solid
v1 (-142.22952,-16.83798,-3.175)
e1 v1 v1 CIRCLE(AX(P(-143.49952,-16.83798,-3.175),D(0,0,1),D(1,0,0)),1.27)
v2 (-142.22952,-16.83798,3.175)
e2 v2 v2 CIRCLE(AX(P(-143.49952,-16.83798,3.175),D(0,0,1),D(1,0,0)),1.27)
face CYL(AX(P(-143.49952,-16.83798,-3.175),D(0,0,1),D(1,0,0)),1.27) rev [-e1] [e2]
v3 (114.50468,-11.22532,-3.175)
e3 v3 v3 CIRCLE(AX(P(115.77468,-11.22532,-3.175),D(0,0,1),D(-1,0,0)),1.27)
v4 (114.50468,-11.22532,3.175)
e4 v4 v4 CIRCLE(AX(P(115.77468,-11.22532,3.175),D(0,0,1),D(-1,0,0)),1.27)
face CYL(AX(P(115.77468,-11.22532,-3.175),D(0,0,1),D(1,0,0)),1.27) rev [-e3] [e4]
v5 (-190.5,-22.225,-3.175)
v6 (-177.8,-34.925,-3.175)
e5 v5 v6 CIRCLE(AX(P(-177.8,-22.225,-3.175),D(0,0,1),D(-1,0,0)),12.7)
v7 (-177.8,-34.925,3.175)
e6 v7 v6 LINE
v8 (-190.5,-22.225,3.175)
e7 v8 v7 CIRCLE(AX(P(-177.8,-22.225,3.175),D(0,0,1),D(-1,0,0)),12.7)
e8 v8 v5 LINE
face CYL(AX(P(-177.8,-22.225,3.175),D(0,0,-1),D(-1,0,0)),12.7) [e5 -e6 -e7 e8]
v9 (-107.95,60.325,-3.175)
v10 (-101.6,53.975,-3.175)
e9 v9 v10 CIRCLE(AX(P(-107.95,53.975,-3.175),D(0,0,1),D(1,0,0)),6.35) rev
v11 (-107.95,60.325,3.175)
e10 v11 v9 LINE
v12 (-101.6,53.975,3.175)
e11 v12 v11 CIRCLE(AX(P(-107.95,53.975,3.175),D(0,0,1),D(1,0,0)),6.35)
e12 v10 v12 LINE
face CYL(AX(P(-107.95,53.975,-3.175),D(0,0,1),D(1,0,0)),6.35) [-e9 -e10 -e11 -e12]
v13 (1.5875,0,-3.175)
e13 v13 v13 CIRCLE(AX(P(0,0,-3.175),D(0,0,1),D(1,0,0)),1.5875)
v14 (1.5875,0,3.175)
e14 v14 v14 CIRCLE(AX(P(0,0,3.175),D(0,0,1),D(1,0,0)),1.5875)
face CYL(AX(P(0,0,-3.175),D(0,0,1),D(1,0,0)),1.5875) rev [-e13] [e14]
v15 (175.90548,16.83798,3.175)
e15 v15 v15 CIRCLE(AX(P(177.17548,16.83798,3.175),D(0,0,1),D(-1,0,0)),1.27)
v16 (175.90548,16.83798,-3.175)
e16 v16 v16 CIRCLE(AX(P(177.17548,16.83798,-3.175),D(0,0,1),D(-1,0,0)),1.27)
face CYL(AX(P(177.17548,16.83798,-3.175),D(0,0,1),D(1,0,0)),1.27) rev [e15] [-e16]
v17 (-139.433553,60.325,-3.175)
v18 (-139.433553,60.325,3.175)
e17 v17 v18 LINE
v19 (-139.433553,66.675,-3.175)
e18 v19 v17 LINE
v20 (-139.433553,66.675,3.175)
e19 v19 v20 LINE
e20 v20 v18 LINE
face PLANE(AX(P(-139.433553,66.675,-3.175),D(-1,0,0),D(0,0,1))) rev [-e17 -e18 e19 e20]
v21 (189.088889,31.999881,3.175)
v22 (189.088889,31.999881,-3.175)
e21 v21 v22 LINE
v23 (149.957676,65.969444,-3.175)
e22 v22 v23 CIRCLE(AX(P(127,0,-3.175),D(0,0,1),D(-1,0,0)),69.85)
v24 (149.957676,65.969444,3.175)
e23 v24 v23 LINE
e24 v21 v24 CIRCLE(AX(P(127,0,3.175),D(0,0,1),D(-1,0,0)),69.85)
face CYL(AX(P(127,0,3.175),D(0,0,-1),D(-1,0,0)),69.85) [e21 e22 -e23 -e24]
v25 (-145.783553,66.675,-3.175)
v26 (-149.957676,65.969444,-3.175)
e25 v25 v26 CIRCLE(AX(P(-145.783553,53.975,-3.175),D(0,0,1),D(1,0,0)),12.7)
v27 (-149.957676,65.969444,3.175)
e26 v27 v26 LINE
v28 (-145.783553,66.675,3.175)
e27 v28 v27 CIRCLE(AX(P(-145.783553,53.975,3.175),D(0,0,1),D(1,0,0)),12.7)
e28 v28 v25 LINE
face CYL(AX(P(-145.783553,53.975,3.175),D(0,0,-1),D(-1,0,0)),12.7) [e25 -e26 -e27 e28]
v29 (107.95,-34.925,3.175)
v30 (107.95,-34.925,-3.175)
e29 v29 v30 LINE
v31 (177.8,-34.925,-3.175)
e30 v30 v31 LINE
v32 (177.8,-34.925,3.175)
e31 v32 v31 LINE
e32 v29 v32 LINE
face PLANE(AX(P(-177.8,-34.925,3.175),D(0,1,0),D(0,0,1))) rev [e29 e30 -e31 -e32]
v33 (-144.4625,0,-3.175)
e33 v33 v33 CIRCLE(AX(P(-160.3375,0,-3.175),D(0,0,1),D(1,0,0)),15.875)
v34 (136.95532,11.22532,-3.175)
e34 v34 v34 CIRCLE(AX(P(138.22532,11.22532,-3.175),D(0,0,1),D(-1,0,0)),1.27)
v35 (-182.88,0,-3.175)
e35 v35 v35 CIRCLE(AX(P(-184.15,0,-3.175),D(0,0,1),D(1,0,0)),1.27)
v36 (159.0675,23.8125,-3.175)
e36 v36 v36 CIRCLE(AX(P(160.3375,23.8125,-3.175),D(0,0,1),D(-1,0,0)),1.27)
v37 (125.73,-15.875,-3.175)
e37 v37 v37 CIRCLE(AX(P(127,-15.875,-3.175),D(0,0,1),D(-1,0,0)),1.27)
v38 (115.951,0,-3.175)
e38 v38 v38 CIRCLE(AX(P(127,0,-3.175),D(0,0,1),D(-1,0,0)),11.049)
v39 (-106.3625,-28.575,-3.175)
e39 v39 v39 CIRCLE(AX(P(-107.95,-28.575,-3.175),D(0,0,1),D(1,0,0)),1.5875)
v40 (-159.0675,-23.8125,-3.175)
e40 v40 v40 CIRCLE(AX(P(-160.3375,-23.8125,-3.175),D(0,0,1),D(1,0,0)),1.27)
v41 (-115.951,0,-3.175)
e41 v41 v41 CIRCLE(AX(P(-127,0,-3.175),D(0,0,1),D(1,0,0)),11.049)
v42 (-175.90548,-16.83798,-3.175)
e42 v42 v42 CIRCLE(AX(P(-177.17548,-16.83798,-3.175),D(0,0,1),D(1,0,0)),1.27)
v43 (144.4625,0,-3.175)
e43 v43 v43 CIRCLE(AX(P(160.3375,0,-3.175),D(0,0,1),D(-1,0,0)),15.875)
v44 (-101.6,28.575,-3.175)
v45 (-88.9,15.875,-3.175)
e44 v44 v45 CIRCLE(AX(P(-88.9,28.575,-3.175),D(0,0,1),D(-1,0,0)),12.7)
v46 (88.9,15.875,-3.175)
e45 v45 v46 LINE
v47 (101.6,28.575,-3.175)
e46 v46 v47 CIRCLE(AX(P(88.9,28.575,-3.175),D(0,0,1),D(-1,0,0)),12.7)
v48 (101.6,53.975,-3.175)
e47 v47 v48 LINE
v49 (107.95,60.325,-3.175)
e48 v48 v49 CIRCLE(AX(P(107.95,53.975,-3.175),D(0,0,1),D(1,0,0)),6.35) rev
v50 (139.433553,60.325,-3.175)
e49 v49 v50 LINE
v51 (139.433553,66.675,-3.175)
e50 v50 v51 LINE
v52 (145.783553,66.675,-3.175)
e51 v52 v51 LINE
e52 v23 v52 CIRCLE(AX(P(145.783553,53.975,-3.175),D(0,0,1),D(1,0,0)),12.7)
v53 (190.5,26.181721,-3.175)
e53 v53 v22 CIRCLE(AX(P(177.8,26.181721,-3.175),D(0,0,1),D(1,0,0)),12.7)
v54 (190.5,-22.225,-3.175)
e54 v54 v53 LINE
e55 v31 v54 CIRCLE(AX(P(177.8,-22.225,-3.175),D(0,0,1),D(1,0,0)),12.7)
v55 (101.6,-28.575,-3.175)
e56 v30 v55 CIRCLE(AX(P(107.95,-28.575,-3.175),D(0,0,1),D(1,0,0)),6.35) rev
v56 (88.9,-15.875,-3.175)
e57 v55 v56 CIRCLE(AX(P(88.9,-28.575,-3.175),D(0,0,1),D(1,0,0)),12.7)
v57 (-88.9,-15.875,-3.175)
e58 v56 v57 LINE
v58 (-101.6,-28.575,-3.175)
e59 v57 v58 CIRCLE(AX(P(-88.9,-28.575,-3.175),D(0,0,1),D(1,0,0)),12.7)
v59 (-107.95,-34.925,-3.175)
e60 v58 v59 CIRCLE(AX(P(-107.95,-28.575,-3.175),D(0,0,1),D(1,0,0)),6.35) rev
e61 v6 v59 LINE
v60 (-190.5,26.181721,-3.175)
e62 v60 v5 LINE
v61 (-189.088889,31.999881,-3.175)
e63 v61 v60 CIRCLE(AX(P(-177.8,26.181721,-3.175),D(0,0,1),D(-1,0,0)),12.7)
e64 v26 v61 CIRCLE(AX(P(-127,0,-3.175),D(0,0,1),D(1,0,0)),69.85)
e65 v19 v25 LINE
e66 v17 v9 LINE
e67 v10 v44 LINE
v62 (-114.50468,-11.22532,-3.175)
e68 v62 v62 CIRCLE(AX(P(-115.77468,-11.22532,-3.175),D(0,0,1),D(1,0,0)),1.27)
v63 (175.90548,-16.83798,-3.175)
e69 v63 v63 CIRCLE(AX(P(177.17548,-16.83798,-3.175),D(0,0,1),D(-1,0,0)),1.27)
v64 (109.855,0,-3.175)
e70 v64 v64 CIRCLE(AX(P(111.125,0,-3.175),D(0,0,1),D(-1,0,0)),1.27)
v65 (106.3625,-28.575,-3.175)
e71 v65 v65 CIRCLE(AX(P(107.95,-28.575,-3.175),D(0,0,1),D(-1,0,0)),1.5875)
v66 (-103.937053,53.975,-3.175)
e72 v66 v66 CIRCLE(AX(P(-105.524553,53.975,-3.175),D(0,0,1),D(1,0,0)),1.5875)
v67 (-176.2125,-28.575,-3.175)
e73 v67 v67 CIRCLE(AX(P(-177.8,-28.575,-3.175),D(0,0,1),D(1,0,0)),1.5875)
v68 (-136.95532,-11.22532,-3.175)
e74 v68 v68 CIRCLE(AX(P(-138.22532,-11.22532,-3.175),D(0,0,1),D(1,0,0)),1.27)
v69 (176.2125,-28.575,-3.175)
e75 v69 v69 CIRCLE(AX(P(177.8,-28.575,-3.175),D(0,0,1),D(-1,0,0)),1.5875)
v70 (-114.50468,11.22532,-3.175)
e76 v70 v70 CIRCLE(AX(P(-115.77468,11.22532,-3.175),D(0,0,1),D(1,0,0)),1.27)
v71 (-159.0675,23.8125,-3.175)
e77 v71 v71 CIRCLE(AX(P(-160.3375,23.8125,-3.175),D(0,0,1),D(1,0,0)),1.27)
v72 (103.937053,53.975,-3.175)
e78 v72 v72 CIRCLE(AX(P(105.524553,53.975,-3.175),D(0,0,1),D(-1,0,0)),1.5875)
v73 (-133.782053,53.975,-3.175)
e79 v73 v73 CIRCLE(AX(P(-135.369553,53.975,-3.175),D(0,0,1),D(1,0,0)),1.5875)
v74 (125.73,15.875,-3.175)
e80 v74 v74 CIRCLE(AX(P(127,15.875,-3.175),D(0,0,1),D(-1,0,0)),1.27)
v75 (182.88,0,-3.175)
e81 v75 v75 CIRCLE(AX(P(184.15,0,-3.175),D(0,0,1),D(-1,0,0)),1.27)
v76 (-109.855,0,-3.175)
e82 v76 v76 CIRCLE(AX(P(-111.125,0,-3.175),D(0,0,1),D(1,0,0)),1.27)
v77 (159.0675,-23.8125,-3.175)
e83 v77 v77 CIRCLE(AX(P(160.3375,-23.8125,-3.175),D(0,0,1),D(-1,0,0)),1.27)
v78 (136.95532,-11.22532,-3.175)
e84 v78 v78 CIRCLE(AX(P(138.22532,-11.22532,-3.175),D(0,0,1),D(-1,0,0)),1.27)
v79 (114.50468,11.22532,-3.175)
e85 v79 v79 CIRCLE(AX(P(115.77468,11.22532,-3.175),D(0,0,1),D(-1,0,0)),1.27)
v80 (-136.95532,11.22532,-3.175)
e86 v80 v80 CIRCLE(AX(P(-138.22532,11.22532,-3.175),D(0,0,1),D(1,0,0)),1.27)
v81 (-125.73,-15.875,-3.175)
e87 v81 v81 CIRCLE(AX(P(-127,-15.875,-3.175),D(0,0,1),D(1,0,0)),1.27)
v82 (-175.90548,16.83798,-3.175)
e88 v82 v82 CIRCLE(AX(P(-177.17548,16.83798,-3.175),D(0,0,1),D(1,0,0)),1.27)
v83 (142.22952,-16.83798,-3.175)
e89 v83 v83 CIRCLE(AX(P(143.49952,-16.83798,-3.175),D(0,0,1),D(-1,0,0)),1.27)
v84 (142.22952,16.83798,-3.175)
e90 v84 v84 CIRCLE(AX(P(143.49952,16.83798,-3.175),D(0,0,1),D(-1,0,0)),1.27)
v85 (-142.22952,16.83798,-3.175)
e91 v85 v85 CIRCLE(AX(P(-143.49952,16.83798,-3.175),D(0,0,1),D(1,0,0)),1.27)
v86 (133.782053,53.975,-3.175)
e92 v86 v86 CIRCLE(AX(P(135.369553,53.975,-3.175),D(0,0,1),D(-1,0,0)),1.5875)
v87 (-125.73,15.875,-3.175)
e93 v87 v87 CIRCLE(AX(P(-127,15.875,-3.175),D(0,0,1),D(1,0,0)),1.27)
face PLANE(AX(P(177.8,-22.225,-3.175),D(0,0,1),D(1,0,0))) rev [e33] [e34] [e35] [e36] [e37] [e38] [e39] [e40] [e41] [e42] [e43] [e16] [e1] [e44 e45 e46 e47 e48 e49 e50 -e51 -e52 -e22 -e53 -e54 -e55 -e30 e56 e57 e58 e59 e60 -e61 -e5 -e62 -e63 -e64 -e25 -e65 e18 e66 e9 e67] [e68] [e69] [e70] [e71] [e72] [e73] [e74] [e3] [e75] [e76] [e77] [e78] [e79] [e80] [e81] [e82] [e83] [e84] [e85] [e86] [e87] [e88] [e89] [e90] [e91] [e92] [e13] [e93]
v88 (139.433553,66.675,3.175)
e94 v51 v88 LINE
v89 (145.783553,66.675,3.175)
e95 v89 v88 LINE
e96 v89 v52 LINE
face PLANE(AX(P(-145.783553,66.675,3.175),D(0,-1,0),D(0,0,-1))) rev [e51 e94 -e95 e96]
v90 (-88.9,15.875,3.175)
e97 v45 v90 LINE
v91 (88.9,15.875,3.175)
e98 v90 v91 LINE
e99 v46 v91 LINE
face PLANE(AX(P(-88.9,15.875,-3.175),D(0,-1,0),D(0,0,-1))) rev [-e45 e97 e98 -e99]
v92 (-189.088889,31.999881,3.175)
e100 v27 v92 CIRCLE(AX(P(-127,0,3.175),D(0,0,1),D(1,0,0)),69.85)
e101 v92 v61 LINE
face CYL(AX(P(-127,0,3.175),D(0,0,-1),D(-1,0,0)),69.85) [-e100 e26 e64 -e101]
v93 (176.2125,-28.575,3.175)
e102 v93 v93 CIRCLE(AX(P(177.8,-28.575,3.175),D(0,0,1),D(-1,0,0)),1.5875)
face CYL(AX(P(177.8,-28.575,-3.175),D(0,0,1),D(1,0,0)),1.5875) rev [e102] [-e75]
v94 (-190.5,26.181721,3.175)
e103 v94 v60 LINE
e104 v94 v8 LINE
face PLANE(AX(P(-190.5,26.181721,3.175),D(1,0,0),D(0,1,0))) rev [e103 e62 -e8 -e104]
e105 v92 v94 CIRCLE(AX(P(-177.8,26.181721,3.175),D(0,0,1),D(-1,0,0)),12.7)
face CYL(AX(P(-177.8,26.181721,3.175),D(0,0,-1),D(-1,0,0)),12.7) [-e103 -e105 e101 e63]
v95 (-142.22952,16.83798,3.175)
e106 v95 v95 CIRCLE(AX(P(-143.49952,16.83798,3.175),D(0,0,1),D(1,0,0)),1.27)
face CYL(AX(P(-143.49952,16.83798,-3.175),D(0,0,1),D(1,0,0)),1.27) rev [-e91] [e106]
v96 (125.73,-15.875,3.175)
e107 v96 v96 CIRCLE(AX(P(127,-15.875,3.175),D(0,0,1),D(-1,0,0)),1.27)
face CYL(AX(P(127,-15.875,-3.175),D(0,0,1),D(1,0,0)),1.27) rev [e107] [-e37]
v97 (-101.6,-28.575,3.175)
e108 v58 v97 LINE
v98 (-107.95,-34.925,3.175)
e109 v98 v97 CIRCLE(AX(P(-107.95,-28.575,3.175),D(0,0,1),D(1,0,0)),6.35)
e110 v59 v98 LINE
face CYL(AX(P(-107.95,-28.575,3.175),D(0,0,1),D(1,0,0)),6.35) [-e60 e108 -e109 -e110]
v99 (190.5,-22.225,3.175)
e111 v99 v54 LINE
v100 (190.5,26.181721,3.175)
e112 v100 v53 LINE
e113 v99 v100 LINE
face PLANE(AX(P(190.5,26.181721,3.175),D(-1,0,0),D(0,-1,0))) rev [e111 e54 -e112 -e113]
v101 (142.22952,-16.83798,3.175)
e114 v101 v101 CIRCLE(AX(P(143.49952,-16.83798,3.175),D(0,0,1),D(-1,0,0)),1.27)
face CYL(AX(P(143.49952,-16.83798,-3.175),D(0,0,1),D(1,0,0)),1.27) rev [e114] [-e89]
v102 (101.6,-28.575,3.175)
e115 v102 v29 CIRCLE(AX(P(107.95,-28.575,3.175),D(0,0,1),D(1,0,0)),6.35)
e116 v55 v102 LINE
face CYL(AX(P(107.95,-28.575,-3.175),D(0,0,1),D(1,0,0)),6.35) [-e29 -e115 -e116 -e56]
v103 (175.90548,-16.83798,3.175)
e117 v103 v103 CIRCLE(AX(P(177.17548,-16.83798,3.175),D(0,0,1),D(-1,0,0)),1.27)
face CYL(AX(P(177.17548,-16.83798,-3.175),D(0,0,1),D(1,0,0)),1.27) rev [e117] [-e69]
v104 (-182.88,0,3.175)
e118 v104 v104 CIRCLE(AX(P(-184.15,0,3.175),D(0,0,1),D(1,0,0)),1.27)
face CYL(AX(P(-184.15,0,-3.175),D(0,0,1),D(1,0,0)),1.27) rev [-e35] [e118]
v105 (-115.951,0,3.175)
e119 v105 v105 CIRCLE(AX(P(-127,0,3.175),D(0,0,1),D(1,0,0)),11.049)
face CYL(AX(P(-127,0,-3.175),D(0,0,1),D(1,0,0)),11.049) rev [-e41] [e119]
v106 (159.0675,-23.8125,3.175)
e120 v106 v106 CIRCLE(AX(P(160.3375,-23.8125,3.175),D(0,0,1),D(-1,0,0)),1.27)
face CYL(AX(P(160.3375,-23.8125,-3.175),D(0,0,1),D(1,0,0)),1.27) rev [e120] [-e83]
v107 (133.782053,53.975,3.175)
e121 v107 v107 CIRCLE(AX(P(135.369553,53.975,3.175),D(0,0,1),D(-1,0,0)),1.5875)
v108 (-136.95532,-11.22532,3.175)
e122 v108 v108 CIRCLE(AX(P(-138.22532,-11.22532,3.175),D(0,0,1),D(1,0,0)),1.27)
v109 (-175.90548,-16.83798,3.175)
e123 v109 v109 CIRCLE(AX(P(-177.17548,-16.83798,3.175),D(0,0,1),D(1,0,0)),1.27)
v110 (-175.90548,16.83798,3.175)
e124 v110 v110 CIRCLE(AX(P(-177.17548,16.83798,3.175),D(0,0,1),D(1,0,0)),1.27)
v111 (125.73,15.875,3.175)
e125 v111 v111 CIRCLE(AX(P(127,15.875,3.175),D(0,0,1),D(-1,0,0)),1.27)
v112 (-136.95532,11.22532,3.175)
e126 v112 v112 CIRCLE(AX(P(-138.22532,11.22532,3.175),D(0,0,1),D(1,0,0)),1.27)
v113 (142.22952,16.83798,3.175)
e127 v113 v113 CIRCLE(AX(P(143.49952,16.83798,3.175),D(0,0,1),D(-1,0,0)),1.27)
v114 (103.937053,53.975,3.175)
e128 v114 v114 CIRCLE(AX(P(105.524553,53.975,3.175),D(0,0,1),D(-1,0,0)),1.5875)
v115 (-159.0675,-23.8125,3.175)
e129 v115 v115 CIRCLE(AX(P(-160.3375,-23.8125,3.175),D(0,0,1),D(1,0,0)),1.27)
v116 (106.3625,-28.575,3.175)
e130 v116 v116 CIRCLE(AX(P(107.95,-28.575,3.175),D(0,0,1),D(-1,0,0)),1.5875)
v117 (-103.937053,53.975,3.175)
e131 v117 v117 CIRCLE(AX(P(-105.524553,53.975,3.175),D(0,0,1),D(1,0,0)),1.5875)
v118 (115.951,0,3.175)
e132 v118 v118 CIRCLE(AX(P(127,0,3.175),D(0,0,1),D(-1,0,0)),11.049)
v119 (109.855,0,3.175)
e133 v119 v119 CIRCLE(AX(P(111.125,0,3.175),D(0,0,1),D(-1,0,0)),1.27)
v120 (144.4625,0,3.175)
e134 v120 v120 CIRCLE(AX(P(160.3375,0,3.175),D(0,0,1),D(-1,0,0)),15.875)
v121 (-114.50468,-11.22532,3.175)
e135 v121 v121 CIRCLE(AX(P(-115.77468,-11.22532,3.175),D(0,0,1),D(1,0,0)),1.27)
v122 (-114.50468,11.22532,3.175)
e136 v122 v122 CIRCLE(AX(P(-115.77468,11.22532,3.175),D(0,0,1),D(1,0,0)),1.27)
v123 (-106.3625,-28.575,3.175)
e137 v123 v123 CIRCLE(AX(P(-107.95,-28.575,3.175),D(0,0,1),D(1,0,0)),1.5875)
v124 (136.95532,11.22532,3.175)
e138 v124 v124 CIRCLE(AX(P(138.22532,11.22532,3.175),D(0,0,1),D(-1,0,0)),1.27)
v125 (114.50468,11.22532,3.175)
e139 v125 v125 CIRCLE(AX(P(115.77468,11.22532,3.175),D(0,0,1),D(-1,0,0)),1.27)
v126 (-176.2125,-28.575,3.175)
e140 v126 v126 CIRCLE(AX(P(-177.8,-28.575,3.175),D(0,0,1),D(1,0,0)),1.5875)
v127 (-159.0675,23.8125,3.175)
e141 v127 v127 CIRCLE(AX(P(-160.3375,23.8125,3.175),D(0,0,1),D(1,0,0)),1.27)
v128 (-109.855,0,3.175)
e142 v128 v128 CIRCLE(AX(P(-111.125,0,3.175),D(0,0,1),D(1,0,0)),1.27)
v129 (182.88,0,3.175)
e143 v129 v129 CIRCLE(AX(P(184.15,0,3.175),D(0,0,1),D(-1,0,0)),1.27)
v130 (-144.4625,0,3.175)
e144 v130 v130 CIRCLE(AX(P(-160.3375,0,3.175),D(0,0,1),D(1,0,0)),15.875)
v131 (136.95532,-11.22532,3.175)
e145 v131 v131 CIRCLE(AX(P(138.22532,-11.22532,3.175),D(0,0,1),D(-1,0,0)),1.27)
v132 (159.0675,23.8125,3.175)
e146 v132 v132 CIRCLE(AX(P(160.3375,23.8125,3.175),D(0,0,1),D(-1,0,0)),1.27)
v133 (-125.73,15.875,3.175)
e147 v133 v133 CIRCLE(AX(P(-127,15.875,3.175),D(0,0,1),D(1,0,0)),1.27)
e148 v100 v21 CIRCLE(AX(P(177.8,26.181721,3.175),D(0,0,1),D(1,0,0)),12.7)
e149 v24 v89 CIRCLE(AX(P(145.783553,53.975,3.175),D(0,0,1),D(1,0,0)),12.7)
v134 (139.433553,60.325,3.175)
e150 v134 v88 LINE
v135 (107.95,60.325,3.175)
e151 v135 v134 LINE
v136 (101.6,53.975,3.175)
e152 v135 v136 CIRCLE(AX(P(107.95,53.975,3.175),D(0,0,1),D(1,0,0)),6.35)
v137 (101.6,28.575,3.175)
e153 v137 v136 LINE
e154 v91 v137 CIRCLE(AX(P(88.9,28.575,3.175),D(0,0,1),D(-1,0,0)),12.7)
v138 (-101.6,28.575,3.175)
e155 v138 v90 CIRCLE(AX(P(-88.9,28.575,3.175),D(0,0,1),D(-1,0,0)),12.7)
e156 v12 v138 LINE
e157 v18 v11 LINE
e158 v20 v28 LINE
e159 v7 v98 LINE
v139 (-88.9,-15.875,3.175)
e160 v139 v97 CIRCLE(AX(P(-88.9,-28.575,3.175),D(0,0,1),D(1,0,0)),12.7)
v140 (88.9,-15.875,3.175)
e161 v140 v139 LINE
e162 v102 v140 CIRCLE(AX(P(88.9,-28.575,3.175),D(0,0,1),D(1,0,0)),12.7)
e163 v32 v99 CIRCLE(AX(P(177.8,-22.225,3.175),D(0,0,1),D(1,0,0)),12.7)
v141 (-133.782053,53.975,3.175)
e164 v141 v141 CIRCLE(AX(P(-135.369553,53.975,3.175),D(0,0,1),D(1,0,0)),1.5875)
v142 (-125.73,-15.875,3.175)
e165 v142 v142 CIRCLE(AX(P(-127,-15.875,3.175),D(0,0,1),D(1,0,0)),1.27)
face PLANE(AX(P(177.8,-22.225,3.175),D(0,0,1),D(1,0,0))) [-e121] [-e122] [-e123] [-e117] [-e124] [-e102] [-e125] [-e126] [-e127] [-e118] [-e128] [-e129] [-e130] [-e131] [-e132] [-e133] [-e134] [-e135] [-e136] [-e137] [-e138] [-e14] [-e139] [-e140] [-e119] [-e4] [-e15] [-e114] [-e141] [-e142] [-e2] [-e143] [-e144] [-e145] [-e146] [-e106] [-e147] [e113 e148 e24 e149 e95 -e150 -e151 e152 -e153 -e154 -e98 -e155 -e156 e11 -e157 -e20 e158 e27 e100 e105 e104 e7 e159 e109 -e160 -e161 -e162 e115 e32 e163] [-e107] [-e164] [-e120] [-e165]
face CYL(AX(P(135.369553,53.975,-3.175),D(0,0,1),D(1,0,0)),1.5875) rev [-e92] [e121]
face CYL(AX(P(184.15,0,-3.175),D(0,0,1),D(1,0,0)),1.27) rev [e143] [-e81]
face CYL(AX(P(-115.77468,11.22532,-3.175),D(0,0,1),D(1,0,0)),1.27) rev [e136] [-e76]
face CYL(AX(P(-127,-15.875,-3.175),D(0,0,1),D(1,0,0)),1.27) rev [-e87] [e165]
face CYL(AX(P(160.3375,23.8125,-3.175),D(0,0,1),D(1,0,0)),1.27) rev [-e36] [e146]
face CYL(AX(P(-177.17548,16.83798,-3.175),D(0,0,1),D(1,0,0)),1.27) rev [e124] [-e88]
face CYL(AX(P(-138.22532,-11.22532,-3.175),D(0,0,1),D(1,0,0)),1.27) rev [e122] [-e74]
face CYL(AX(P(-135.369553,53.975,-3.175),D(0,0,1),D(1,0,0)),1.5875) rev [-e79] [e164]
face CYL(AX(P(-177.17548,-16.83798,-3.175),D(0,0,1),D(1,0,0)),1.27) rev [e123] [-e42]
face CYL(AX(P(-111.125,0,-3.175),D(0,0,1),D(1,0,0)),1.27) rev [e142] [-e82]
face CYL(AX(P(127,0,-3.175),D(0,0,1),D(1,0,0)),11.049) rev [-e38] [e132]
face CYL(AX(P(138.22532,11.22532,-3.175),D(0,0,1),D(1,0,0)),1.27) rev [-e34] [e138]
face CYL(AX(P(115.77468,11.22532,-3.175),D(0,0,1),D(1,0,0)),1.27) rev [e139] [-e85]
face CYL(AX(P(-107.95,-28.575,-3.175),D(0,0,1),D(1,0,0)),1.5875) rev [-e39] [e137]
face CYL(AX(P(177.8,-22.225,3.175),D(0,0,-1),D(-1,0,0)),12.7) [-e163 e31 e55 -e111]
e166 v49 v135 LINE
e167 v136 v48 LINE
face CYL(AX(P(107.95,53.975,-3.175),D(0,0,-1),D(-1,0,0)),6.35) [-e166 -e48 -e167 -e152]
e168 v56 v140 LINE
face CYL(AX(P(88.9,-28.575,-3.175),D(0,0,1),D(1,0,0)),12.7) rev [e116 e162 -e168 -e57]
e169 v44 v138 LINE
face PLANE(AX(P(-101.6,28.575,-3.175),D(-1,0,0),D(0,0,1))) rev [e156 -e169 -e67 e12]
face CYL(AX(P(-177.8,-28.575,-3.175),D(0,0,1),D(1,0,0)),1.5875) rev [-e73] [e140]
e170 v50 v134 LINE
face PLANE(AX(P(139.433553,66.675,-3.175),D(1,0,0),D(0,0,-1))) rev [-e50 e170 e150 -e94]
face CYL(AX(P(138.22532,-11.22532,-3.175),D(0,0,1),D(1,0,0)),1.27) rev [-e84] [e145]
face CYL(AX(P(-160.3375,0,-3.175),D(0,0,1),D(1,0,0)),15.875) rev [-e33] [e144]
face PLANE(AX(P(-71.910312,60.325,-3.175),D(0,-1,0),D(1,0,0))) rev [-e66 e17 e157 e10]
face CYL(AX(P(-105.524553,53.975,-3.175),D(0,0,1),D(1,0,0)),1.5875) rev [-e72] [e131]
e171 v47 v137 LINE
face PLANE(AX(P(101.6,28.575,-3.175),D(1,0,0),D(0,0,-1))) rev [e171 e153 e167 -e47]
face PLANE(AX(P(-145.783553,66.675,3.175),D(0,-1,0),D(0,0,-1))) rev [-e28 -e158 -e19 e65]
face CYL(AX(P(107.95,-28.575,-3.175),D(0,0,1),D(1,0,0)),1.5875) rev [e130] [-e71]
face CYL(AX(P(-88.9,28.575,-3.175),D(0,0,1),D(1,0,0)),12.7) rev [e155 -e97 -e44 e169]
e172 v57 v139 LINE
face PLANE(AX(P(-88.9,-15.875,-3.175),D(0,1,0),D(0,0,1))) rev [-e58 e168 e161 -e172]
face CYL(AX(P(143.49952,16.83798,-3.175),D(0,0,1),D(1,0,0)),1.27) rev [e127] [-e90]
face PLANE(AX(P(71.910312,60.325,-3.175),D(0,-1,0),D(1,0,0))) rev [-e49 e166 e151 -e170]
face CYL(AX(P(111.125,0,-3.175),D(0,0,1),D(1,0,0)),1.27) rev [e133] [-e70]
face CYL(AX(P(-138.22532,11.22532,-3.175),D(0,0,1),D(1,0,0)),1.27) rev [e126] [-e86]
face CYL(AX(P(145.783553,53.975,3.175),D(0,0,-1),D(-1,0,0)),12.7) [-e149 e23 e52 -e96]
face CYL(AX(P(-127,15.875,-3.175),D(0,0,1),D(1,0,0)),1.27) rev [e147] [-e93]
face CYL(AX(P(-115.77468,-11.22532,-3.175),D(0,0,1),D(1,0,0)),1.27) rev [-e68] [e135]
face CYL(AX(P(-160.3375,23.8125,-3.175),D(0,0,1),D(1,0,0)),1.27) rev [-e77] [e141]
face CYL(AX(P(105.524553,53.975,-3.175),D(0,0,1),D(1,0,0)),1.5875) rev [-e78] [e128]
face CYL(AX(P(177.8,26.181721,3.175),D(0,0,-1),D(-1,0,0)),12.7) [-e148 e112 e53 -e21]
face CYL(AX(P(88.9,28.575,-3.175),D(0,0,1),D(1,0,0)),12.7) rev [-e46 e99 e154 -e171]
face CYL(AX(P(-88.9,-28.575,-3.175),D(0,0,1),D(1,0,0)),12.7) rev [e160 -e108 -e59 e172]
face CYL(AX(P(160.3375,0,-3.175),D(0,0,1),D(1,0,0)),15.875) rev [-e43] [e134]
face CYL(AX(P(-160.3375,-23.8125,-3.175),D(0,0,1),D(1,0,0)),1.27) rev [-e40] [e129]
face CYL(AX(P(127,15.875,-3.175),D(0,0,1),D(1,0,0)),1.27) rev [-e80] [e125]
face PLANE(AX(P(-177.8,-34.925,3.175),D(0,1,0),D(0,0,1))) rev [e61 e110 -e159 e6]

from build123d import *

# Parameters (mm, degrees)
SKETCH1_R           = 3.175
BOSS_EXTRUDE1_DEPTH = 3.175
SKETCH2_R           = 11.049
SKETCH2_R_2         = 15.875
SKETCH2_R_3         = 1.27
CUT_EXTRUDE1_DEPTH  = 202.930998425
ITC_CUTOUT_DEPTH    = 202.930998425
SKETCH6_W           = 67.523241089
SKETCH6_H           = 6.35
CUT_EXTRUDE3_DEPTH  = 202.930998425
FILLET1_R           = 6.35
CUT_EXTRUDE4_DEPTH  = 202.930998425
FILLET2_R           = 6.35
SKETCH8_R           = 1.5875
CUT_EXTRUDE5_DEPTH  = 202.930998425
SKETCH10_R          = 1.5875
CUT_EXTRUDE6_DEPTH  = 202.930998425


with BuildPart() as part:
    # Sketch1 → Boss-Extrude1 (new, symmetric)
    with BuildSketch(Plane.XY):
        with BuildLine():
            Line((-145.783553311, 66.675), (145.783553311, 66.675))
            ThreePointArc((145.783553311, 66.675), (147.900219978, 66.497368874), (149.957676269, 65.969444444))
            ThreePointArc((149.957676269, 65.969444444), (172.789871953, 52.74760778), (189.088888889, 31.999880883))
            ThreePointArc((189.088888889, 31.999880883), (190.142181511, 29.17513943), (190.5, 26.181720723))
            Line((190.5, 26.181720723), (190.5, -22.225))
            ThreePointArc((190.5, -22.225), (186.780256121, -31.205256121), (177.8, -34.925))
            Line((177.8, -34.925), (-177.8, -34.925))
            ThreePointArc((-177.8, -34.925), (-186.780256121, -31.205256121), (-190.5, -22.225))
            Line((-190.5, -22.225), (-190.5, 26.181720723))
            ThreePointArc((-190.5, 26.181720723), (-190.142181511, 29.17513943), (-189.088888889, 31.999880883))
            ThreePointArc((-189.088888889, 31.999880883), (-172.789871953, 52.74760778), (-149.957676269, 65.969444444))
            ThreePointArc((-149.957676269, 65.969444444), (-147.900219978, 66.497368874), (-145.783553311, 66.675))
        make_face()
        with Locations((-127, 0)):
            Circle(SKETCH1_R, mode=Mode.SUBTRACT)
        with Locations((127, 0)):
            Circle(SKETCH1_R, mode=Mode.SUBTRACT)
    extrude(amount=BOSS_EXTRUDE1_DEPTH, both=True)

    # Sketch2 → Cut-Extrude1 (cut, through all)
    with BuildSketch(Plane.XY.offset(3.175)):
        with Locations((-127, 0)):
            Circle(SKETCH2_R)
        with Locations((-160.3375, 0)):
            Circle(SKETCH2_R_2)
        with Locations((-143.499519773, 16.837980227)):
            Circle(SKETCH2_R_3)
        with Locations((-160.3375, 23.8125)):
            Circle(SKETCH2_R_3)
        with Locations((-143.499519773, -16.837980227)):
            Circle(SKETCH2_R_3)
        with Locations((-160.3375, -23.8125)):
            Circle(SKETCH2_R_3)
        with Locations((-177.175480227, -16.837980227)):
            Circle(SKETCH2_R_3)
        with Locations((-184.15, 0)):
            Circle(SKETCH2_R_3)
        with Locations((-177.175480227, 16.837980227)):
            Circle(SKETCH2_R_3)
        with Locations((-127, 15.875)):
            Circle(SKETCH2_R_3)
        with Locations((-115.774679849, 11.225320151)):
            Circle(SKETCH2_R_3)
        with Locations((-111.125, 0)):
            Circle(SKETCH2_R_3)
        with Locations((-115.774679849, -11.225320151)):
            Circle(SKETCH2_R_3)
        with Locations((-127, -15.875)):
            Circle(SKETCH2_R_3)
        with Locations((-138.225320151, -11.225320151)):
            Circle(SKETCH2_R_3)
        with Locations(Location((138.225320151, 11.225320151, 0), (0, 0, 180))):
            Circle(SKETCH2_R_3)
        with Locations((-138.225320151, 11.225320151)):
            Circle(SKETCH2_R_3)
        with Locations(Location((138.225320151, -11.225320151, 0), (0, 0, 180))):
            Circle(SKETCH2_R_3)
        with Locations(Location((127, -15.875, 0), (0, 0, 180))):
            Circle(SKETCH2_R_3)
        with Locations(Location((115.774679849, -11.225320151, 0), (0, 0, 180))):
            Circle(SKETCH2_R_3)
        with Locations(Location((111.125, 0, 0), (0, 0, 180))):
            Circle(SKETCH2_R_3)
        with Locations(Location((115.774679849, 11.225320151, 0), (0, 0, 180))):
            Circle(SKETCH2_R_3)
        with Locations(Location((127, 15.875, 0), (0, 0, 180))):
            Circle(SKETCH2_R_3)
        with Locations(Location((177.175480227, 16.837980227, 0), (0, 0, 180))):
            Circle(SKETCH2_R_3)
        with Locations(Location((184.15, 0, 0), (0, 0, 180))):
            Circle(SKETCH2_R_3)
        with Locations(Location((177.175480227, -16.837980227, 0), (0, 0, 180))):
            Circle(SKETCH2_R_3)
        with Locations(Location((160.3375, -23.8125, 0), (0, 0, 180))):
            Circle(SKETCH2_R_3)
        with Locations(Location((143.499519773, -16.837980227, 0), (0, 0, 180))):
            Circle(SKETCH2_R_3)
        with Locations(Location((160.3375, 23.8125, 0), (0, 0, 180))):
            Circle(SKETCH2_R_3)
        with Locations(Location((143.499519773, 16.837980227, 0), (0, 0, 180))):
            Circle(SKETCH2_R_3)
        with Locations(Location((160.3375, 0, 0), (0, 0, 180))):
            Circle(SKETCH2_R_2)
        with Locations(Location((127, 0, 0), (0, 0, 180))):
            Circle(SKETCH2_R)
    extrude(amount=-CUT_EXTRUDE1_DEPTH, mode=Mode.SUBTRACT)

    # Sketch5 → ITC_Cutout (cut, through all)
    with BuildSketch(Plane.XY.offset(3.175)):
        with BuildLine():
            Line((-88.9, 15.875), (88.9, 15.875))
            ThreePointArc((88.9, 15.875), (97.880256121, 19.594743879), (101.6, 28.575))
            Line((101.6, 28.575), (101.6, 66.675))
            Line((101.6, 66.675), (-101.6, 66.675))
            Line((-101.6, 66.675), (-101.6, 28.575))
            ThreePointArc((-101.6, 28.575), (-97.880256121, 19.594743879), (-88.9, 15.875))
        make_face()
    extrude(amount=-ITC_CUTOUT_DEPTH, mode=Mode.SUBTRACT)

    # Sketch6 → Cut-Extrude3 (cut, through all)
    with BuildSketch(Plane.XY.offset(3.175)):
        with Locations((-105.671932766, 63.5)):
            Rectangle(SKETCH6_W, SKETCH6_H)
        with Locations((105.671932766, 63.5)):
            Rectangle(SKETCH6_W, SKETCH6_H)
    extrude(amount=-CUT_EXTRUDE3_DEPTH, mode=Mode.SUBTRACT)

    # Fillet1
    fillet1_edges = [part.edges().sort_by_distance(p)[0] for p in [
        (-101.6, 60.325, 0),
        (101.6, 60.325, 0),
    ]]
    fillet(fillet1_edges, radius=FILLET1_R)

    # Sketch7 → Cut-Extrude4 (cut, through all)
    with BuildSketch(Plane.XY.offset(3.175)):
        with BuildLine():
            Line((-88.9, -15.875), (88.9, -15.875))
            ThreePointArc((88.9, -15.875), (97.880256121, -19.594743879), (101.6, -28.575))
            Line((101.6, -28.575), (101.6, -34.925))
            Line((101.6, -34.925), (-101.6, -34.925))
            Line((-101.6, -34.925), (-101.6, -28.575))
            ThreePointArc((-101.6, -28.575), (-97.880256121, -19.594743879), (-88.9, -15.875))
        make_face()
    extrude(amount=-CUT_EXTRUDE4_DEPTH, mode=Mode.SUBTRACT)

    # Fillet2
    fillet2_edges = [part.edges().sort_by_distance(p)[0] for p in [
        (101.6, -34.925, 0),
        (-101.6, -34.925, 0),
    ]]
    fillet(fillet2_edges, radius=FILLET2_R - 0.0001)  # a hair under: the kernel refuses the full size

    # Sketch8 → Cut-Extrude5 (cut, through all)
    with BuildSketch(Plane.XY.offset(3.175)):
        with Locations((-135.369553311, 53.975)):
            Circle(SKETCH8_R)
        with Locations((-105.524553311, 53.975)):
            Circle(SKETCH8_R)
        with Locations(Location((105.524553311, 53.975, 0), (0, 0, 180))):
            Circle(SKETCH8_R)
        with Locations(Location((135.369553311, 53.975, 0), (0, 0, 180))):
            Circle(SKETCH8_R)
    extrude(amount=-CUT_EXTRUDE5_DEPTH, mode=Mode.SUBTRACT)

    # Sketch10 → Cut-Extrude6 (cut, through all)
    with BuildSketch(Plane.XY.offset(3.175)):
        with Locations((-177.8, -28.575)):
            Circle(SKETCH10_R)
        with Locations((-107.95, -28.575)):
            Circle(SKETCH10_R)
        with Locations(Location((107.95, -28.575, 0), (0, 0, 180))):
            Circle(SKETCH10_R)
        with Locations(Location((177.8, -28.575, 0), (0, 0, 180))):
            Circle(SKETCH10_R)
        Circle(SKETCH10_R)
    extrude(amount=-CUT_EXTRUDE6_DEPTH, mode=Mode.SUBTRACT)


solid = part.part
